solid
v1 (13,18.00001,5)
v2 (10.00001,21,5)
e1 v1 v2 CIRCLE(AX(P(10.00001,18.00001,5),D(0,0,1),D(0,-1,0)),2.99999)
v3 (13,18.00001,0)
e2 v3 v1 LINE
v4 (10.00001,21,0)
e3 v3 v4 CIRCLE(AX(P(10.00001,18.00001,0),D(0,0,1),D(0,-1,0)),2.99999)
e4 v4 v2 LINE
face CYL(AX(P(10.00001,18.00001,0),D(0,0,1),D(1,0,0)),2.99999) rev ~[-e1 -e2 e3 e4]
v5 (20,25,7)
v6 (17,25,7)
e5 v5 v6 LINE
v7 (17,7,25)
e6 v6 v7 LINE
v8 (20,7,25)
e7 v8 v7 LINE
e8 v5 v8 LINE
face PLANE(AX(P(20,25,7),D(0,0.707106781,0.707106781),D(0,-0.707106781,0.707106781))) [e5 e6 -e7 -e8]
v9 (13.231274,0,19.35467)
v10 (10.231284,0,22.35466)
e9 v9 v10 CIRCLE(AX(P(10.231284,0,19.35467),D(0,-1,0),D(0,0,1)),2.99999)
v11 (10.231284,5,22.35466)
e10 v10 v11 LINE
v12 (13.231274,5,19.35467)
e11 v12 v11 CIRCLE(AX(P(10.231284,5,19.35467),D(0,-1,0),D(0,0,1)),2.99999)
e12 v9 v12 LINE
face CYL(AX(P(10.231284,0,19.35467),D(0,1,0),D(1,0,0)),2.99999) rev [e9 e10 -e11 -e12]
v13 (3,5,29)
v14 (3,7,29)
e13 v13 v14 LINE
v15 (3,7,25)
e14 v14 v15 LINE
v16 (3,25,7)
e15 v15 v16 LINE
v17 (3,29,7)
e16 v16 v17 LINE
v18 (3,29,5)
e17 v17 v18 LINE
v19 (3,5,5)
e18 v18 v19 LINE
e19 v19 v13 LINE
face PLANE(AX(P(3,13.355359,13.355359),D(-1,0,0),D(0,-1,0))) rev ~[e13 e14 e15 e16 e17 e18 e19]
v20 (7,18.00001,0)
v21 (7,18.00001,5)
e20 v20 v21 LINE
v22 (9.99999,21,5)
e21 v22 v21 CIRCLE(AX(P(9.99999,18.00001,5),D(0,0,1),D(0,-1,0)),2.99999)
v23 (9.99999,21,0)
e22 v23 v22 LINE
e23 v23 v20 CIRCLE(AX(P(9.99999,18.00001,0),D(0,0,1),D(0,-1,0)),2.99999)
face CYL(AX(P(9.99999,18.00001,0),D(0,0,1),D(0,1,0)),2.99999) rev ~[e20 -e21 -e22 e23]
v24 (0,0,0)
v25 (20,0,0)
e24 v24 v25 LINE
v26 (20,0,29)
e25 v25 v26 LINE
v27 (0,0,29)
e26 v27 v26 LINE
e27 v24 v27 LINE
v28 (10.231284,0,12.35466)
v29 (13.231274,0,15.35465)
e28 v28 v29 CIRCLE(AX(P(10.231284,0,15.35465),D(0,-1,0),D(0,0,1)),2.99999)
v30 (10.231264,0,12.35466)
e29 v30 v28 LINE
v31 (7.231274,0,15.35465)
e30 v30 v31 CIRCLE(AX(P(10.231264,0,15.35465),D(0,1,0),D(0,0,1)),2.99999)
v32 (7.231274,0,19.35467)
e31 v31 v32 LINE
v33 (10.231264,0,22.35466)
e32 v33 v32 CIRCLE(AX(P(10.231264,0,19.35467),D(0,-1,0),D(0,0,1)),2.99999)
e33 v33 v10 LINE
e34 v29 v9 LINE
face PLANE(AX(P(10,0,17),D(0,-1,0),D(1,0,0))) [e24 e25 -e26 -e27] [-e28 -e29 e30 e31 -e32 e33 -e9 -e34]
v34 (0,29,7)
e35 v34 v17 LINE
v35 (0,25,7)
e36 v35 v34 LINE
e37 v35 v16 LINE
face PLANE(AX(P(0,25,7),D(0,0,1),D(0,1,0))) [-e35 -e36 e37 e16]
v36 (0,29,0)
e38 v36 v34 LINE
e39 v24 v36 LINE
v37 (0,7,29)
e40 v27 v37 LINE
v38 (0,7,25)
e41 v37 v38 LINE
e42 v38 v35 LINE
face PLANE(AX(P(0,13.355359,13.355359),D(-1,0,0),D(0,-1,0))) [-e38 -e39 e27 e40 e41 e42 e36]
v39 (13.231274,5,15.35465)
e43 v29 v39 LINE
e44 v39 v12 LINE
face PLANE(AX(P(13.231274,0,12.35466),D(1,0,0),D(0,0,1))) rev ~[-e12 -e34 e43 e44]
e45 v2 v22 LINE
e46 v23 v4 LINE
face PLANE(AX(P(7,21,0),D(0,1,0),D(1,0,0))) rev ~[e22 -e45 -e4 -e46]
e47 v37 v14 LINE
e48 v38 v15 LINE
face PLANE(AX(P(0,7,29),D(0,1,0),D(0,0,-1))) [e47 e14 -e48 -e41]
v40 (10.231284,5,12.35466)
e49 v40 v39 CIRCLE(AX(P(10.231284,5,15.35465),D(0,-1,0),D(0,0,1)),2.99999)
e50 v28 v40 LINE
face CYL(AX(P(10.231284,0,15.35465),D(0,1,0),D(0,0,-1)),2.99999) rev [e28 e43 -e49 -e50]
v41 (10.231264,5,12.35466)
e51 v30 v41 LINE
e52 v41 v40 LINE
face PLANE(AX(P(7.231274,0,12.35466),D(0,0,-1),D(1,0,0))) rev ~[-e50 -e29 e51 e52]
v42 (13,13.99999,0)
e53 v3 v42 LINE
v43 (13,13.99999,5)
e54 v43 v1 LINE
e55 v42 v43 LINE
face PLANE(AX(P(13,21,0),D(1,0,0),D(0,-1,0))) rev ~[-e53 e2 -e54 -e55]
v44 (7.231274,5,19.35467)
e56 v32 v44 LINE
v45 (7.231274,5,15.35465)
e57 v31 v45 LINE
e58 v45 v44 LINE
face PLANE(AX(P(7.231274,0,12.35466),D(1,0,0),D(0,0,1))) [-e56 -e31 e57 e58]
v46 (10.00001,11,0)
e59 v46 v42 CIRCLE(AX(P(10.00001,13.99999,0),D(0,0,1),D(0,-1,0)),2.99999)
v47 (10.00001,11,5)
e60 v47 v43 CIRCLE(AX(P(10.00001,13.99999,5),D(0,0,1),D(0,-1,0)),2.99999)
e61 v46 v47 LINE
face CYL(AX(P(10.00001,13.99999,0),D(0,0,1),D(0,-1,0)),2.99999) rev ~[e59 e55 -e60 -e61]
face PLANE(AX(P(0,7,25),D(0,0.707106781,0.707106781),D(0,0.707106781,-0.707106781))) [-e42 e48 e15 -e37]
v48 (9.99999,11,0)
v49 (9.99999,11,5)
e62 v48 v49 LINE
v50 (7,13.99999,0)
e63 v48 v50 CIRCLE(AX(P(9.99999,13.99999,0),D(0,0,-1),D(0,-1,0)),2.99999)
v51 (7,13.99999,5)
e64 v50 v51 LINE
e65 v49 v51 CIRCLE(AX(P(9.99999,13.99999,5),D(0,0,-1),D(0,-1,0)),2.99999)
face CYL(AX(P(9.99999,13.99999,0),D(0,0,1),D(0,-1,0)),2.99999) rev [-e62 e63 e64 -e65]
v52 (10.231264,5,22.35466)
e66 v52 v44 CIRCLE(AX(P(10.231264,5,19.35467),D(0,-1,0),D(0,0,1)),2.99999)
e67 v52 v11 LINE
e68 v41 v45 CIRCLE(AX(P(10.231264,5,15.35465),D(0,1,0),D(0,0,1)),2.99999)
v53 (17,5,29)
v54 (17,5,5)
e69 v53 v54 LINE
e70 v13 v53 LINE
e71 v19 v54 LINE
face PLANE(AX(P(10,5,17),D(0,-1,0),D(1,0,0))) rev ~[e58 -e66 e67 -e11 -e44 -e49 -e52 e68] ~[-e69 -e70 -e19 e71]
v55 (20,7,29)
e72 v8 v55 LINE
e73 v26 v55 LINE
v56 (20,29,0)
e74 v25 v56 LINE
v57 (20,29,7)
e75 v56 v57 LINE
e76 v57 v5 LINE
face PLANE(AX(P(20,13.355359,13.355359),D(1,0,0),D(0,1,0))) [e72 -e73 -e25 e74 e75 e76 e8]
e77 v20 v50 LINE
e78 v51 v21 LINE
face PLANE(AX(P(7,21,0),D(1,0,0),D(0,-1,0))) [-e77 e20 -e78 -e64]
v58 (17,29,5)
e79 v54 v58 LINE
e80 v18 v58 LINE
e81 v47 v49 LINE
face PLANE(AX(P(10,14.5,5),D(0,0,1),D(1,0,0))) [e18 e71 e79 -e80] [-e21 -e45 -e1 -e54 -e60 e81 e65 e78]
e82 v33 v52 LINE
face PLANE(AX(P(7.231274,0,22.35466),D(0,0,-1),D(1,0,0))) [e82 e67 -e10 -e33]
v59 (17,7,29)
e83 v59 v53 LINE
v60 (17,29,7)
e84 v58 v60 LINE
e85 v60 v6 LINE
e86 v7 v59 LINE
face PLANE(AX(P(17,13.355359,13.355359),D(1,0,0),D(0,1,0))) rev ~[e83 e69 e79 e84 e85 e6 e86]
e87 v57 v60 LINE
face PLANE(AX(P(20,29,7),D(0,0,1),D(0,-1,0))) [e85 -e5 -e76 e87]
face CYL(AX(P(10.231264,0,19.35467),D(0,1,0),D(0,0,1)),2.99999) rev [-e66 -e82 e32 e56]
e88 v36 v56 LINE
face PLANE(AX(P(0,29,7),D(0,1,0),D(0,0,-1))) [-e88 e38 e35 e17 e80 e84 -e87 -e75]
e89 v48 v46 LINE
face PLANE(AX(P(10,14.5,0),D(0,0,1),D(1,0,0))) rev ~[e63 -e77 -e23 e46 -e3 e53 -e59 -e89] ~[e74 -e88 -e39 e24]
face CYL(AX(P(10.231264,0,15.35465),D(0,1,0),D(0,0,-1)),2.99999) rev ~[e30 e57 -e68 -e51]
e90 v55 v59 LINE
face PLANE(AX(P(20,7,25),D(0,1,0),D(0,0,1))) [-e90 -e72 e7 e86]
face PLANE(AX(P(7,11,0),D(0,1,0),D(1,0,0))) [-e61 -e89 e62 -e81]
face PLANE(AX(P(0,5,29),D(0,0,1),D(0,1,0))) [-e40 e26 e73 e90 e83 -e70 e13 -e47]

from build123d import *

# Parameters (mm, degrees)
F0_W      = 20
F0_H      = 29
F1_DEPTH  = 5
F3_W      = 20
F3_H      = 24
F4_DEPTH  = 5
F6_DEPTH  = 3
F8_DEPTH  = 3
F9_W      = 6
F9_H      = 10
F10_DEPTH = 29.001
F11_W     = 6
F11_H     = 10
F12_DEPTH = 29.001
F13_R     = 2.99999


# Not quite as in the source:
# - a fillet or chamfer is up to 0.001 mm smaller than in the source, because OpenCascade refuses the exact size


with BuildPart() as f1:
    # F0 (on Top) → F1 (new body)
    with BuildSketch(Plane.XY):
        with Locations((10, 14.5)):
            Rectangle(F0_W, F0_H)
    extrude(amount=F1_DEPTH)

    # F3 (on face) → F4 (join)
    with BuildSketch(Plane.XZ):
        with Locations((10, 17)):
            Rectangle(F3_W, F3_H)
    extrude(amount=-F4_DEPTH)

    # F5 (on face) → F6 (join)
    with BuildSketch(Plane.YZ.offset(20)):
        Polygon((7, 29), (5, 29), (5, 5), (29, 5), (29, 7), (25, 7), (7, 25), align=None)
    extrude(amount=-F6_DEPTH)

    # F7 (on face) → F8 (join)
    with BuildSketch(Plane(origin=(0, 0, 0), x_dir=(0, -1, 0), z_dir=(-1, 0, 0))):
        Polygon((-29, 7), (-29, 5), (-5, 5), (-5, 29), (-7, 29), (-7, 25), (-25, 7), align=None)
    extrude(amount=-F8_DEPTH)

    # F9 (on face) → F10 (cut, through all)
    with BuildSketch(Plane(origin=(0, 0, 0), x_dir=(1, 0, 0), z_dir=(0, 0, -1))):
        with Locations((10, -16)):
            Rectangle(F9_W, F9_H)
    extrude(amount=-F10_DEPTH, mode=Mode.SUBTRACT)

    # F11 (on face) → F12 (cut, through all)
    with BuildSketch(Plane.XZ):
        with Locations((10.2312741801, 17.3546597362)):
            Rectangle(F11_W, F11_H)
    extrude(amount=-F12_DEPTH, mode=Mode.SUBTRACT)

    # F13 (radius 3 in the source; OpenCascade refuses exactly that, so slightly less here)
    f13_edges = [f1.edges().sort_by_distance(p)[0] for p in [
        (7, 11, 2.5),
        (13, 11, 2.5),
        (7, 21, 2.5),
        (13, 21, 2.5),
        (7.231274, 2.5, 12.35466),
        (13.231274, 2.5, 12.35466),
        (7.231274, 2.5, 22.35466),
        (13.231274, 2.5, 22.35466),
    ]]
    fillet(f13_edges, radius=F13_R)


solid = f1.part
